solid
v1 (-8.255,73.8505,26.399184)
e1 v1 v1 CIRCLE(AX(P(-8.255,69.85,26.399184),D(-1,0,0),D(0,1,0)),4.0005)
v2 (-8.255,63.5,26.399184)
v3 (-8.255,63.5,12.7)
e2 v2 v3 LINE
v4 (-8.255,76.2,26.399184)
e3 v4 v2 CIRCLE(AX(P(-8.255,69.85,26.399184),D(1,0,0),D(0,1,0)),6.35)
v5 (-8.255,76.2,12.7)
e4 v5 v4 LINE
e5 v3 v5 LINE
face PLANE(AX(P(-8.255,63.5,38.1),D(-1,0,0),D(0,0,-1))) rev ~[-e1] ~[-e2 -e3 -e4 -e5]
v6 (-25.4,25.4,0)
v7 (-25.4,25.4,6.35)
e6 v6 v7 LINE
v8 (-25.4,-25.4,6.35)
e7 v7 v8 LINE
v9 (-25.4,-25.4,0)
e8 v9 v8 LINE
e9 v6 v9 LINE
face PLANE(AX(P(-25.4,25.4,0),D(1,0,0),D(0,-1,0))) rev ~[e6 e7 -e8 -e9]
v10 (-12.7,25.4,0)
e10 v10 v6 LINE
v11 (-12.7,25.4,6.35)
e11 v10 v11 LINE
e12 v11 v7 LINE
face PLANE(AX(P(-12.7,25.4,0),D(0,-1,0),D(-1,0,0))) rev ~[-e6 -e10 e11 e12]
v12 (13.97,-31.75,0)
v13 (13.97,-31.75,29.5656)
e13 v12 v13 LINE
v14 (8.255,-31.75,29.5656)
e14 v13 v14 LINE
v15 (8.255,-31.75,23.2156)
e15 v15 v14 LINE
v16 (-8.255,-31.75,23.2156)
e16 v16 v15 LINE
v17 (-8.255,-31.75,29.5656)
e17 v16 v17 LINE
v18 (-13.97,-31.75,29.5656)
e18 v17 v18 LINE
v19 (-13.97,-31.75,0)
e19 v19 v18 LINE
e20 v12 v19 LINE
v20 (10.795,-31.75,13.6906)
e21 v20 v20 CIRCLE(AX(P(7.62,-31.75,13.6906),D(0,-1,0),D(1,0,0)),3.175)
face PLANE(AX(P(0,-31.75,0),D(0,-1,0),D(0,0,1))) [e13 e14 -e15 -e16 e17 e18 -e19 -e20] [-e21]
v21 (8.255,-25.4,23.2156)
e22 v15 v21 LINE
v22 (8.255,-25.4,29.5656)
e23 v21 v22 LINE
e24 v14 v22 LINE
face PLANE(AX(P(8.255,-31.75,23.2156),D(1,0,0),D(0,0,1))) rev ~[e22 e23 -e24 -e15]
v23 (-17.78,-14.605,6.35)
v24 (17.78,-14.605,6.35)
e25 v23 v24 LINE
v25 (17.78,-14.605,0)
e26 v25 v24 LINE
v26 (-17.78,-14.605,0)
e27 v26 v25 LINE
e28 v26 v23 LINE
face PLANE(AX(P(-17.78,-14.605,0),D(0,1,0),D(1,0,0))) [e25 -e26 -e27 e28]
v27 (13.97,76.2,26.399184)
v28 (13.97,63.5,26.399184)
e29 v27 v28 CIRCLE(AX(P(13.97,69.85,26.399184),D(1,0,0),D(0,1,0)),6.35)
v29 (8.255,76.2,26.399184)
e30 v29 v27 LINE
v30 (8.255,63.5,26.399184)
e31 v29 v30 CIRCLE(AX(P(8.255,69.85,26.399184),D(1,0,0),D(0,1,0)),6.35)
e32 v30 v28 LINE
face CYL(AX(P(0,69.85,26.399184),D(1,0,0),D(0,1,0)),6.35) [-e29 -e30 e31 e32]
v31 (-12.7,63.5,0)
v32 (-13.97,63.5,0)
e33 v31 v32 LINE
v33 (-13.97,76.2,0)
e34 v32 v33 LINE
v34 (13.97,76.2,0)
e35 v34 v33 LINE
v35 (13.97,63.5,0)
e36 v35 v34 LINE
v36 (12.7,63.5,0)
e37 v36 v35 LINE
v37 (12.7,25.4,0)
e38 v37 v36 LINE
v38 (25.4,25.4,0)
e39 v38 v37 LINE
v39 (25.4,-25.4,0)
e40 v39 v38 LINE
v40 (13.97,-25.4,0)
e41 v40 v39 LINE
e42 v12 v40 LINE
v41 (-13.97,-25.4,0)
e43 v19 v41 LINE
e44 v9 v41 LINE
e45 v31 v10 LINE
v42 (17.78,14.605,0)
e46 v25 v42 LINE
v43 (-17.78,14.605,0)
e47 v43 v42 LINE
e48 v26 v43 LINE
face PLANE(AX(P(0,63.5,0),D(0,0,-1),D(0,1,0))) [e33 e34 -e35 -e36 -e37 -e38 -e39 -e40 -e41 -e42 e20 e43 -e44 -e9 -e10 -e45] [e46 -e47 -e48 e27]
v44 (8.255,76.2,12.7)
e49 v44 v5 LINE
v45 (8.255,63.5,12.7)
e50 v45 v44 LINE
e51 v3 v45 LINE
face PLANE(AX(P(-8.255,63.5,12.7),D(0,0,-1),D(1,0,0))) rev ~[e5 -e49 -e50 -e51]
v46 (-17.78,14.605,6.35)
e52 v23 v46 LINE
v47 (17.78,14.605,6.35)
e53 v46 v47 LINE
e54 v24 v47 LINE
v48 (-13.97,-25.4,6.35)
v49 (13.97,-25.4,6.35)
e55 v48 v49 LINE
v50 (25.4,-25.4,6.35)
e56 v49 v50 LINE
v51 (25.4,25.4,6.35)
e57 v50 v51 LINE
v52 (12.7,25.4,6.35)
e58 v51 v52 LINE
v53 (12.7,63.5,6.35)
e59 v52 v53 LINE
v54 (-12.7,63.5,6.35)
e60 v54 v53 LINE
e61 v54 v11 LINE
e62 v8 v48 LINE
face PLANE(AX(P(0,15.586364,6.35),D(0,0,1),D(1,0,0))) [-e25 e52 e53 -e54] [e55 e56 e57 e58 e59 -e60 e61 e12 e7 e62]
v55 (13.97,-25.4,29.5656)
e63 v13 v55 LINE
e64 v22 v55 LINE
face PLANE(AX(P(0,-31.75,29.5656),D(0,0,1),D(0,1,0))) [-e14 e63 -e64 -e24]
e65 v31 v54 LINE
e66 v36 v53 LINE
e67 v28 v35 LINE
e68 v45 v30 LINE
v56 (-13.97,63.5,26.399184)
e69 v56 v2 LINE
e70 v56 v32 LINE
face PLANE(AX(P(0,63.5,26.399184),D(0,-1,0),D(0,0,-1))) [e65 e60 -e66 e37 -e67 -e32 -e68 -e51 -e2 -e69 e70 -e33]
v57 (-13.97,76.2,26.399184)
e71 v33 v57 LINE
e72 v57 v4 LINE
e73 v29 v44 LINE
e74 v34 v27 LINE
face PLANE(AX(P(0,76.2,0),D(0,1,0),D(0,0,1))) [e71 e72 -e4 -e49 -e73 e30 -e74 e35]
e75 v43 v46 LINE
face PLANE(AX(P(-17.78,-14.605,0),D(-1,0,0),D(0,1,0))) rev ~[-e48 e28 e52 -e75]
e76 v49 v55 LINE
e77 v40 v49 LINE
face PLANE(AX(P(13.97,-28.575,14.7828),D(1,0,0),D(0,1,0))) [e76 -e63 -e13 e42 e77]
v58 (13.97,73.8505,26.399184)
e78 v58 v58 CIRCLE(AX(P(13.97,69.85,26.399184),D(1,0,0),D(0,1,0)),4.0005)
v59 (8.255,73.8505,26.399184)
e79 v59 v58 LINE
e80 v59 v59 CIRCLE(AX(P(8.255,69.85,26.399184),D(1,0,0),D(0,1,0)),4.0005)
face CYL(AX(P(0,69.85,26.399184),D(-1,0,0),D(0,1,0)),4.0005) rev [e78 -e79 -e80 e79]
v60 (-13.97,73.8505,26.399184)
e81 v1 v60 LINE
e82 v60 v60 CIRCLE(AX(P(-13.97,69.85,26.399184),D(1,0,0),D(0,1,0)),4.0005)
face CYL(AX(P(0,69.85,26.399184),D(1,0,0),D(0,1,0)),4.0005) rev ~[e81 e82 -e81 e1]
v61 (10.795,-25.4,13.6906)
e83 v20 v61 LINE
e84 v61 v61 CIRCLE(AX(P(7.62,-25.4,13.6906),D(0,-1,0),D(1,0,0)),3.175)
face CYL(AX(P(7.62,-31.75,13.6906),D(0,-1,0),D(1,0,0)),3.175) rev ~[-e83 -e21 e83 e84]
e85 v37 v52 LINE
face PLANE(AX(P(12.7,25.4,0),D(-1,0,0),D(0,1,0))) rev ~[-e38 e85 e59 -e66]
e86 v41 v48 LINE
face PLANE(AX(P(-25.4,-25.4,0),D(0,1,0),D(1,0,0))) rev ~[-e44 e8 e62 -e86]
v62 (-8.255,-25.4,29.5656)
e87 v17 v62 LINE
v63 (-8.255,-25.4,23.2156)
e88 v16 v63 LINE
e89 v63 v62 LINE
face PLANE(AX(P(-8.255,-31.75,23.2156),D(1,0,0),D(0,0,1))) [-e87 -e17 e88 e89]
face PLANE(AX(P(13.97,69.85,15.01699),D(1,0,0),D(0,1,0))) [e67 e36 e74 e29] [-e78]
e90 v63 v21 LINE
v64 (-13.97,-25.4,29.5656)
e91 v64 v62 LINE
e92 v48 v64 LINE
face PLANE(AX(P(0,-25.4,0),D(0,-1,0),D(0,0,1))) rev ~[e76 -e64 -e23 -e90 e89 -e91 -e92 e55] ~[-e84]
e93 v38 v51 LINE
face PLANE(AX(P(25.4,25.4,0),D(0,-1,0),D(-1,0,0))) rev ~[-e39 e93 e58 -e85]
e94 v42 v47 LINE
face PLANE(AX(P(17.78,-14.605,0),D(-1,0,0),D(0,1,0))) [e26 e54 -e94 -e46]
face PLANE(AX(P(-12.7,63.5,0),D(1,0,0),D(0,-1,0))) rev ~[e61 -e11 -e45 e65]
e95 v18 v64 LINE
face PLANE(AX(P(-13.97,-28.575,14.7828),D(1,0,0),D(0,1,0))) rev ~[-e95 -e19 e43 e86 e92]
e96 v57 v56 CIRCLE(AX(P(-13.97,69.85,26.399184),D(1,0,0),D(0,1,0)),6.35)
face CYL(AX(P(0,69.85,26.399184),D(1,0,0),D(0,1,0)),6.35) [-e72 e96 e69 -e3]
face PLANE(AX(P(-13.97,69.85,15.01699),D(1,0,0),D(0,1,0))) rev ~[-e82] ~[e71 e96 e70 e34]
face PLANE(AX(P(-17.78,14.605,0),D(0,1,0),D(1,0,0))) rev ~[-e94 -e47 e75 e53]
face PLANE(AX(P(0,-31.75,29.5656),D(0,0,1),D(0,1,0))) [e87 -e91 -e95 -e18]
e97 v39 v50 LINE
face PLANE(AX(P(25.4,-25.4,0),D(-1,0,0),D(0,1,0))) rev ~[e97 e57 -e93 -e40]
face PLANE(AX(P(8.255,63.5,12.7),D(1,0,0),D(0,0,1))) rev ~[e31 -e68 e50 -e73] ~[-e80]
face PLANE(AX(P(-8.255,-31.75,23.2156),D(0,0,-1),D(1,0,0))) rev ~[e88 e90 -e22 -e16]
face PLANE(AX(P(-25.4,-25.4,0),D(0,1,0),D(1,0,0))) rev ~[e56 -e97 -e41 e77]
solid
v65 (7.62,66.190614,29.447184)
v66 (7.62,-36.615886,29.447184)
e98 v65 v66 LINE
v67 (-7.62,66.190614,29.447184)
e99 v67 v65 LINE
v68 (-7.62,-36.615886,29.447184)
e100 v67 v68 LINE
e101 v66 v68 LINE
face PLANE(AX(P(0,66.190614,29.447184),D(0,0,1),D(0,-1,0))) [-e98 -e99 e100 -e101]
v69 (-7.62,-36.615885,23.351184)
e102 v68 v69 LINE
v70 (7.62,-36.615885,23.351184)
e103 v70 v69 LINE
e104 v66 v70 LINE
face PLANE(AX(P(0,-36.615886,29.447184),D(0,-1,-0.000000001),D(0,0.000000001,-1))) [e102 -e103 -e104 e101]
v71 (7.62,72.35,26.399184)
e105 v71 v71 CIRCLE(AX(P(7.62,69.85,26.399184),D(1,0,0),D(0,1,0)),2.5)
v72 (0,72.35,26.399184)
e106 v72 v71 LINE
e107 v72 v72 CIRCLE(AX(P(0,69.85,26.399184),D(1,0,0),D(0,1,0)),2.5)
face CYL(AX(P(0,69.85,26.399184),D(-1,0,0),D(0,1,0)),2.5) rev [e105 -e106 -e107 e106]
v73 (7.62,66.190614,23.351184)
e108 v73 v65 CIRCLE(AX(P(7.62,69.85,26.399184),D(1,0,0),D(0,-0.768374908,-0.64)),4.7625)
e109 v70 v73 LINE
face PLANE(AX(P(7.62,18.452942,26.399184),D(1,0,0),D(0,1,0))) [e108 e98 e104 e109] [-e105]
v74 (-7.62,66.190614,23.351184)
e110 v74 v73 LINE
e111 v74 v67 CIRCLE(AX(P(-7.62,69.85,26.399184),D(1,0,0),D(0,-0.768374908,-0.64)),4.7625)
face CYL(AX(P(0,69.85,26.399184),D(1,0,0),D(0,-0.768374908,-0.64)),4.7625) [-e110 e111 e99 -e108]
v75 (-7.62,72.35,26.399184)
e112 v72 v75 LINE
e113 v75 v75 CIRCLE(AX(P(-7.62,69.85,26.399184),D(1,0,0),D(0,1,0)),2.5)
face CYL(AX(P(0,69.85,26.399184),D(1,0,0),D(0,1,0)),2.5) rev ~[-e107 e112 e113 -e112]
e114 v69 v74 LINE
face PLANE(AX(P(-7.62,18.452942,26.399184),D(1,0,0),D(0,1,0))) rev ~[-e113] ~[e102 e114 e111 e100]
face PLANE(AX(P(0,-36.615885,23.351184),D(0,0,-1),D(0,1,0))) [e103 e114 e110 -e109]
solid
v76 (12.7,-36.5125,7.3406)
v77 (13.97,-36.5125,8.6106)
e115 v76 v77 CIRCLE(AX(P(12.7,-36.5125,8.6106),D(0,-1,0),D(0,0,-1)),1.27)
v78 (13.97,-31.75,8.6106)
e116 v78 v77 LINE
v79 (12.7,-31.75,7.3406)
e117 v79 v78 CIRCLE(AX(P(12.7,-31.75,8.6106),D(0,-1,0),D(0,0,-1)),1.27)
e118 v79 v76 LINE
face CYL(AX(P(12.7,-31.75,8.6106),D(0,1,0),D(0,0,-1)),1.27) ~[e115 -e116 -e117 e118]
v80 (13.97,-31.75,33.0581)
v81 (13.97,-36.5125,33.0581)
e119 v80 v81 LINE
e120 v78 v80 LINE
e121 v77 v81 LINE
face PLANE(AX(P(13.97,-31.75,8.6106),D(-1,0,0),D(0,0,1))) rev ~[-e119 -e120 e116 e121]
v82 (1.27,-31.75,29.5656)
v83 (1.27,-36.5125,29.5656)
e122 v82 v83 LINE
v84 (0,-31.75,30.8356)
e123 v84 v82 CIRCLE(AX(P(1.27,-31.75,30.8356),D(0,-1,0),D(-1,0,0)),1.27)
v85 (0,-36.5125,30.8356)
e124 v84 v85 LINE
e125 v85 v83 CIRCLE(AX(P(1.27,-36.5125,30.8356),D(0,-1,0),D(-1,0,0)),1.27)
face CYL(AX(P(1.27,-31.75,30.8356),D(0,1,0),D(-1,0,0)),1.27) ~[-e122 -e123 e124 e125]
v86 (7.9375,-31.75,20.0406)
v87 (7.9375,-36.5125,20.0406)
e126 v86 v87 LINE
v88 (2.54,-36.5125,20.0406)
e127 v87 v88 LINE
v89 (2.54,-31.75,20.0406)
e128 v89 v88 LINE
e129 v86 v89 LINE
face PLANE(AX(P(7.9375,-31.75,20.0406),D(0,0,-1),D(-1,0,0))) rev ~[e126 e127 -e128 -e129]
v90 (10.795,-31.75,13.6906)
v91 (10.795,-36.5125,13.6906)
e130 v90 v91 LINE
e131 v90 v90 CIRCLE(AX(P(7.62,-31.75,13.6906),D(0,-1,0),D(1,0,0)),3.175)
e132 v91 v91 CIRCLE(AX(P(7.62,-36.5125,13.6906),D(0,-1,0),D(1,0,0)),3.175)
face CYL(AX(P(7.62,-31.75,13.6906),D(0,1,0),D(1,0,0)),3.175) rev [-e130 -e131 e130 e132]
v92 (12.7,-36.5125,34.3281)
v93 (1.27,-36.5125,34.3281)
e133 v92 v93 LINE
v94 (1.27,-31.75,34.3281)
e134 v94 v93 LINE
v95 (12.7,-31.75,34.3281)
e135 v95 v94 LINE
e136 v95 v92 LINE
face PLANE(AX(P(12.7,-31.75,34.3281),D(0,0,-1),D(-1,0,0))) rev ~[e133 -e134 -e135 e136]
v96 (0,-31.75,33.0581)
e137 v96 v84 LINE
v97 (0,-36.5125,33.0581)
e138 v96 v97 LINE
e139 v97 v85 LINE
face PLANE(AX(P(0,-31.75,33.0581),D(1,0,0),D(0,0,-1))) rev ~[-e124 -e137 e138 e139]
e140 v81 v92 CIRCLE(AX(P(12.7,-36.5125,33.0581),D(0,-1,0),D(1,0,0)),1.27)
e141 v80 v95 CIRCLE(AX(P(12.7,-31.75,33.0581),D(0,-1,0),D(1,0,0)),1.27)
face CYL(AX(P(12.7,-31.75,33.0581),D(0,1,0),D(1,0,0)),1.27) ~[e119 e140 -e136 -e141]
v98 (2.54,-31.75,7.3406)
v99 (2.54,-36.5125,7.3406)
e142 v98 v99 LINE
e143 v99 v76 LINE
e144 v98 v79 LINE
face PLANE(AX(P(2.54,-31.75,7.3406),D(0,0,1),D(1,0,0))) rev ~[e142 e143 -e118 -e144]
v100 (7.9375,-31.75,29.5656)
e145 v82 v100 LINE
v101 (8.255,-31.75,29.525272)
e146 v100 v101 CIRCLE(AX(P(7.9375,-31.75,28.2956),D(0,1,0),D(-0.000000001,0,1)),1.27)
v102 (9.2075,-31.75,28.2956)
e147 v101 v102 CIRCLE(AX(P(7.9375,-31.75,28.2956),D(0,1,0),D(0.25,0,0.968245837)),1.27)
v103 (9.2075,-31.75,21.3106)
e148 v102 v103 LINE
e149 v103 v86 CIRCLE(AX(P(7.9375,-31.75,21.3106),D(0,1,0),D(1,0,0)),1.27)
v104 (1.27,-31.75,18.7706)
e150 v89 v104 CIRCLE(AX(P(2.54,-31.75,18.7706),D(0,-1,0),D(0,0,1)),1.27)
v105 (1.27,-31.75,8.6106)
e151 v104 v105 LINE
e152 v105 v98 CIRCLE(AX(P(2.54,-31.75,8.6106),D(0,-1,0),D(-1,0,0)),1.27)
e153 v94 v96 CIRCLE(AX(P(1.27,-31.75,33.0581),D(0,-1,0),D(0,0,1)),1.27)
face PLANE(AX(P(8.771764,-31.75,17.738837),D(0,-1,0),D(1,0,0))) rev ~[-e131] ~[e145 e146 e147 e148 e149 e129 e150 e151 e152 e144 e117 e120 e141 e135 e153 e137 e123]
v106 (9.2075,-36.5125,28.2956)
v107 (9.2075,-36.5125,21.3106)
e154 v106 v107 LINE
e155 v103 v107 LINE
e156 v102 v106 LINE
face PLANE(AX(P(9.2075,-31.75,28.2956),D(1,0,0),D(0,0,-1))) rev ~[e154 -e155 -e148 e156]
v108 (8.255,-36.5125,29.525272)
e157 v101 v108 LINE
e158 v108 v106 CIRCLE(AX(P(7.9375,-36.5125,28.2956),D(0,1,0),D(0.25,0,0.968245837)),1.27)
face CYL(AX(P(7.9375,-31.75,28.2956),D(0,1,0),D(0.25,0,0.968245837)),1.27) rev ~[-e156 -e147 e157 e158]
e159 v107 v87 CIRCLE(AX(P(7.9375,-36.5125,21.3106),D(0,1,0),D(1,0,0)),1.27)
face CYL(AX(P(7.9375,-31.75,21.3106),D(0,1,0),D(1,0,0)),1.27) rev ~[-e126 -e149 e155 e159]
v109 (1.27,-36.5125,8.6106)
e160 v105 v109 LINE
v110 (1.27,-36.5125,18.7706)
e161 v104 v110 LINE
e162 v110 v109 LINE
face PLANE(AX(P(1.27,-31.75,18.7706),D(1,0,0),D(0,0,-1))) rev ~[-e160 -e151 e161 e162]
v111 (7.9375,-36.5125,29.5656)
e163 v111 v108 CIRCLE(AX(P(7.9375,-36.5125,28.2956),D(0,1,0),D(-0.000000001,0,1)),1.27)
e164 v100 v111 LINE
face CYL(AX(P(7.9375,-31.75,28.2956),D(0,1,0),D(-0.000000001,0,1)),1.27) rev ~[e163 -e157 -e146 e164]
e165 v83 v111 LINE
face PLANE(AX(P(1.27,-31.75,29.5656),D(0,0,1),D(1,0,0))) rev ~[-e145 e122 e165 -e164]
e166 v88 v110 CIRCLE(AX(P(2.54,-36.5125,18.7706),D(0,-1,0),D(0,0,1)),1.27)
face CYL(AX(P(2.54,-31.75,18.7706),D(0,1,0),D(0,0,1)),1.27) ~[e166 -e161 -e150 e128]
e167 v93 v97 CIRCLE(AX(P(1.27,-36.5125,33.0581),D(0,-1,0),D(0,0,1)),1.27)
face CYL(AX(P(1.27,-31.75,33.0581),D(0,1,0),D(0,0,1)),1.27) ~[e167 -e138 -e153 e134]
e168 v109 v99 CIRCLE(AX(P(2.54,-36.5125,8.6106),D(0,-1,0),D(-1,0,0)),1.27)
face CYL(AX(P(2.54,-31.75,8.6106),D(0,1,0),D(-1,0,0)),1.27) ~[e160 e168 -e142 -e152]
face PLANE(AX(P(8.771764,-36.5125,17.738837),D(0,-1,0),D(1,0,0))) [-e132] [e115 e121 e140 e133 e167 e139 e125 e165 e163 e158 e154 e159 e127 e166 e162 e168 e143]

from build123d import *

# Parameters (mm, degrees)
F0_W          = 35.56
F0_H          = 29.21
F1_DEPTH      = 6.35
F2_R          = 4.0005
F2_W          = 6.35
F2_H          = 29.5656
F3_DEPTH      = 13.97
F3_DEPTH_BACK = 13.97
F4_W          = 16.51
F4_H          = 11.7008156112
F4_H_2        = 13.6991843888
F5_DEPTH      = 12.701
F6_R          = 2.5
F7_DEPTH      = 7.62
F7_DEPTH_BACK = 7.62
F8_W          = 16.51
F8_H          = 6.35
F9_DEPTH      = 106.3635
F10_R         = 3.175
F11_DEPTH     = 4.7625
F12_DEPTH     = 6.35


with BuildPart() as f1:
    # F0 (on Top) → F1 (new body)
    with BuildSketch(Plane.XY):
        Polygon((-12.7, 25.4), (-25.4, 25.4), (-25.4, -25.4), (25.4, -25.4), (25.4, 25.4), (12.7, 25.4), (12.7, 63.5), (-12.7, 63.5), align=None)
        Rectangle(F0_W, F0_H, mode=Mode.SUBTRACT)
    extrude(amount=F1_DEPTH)

    # F2 (on Right) → F3 (join, two sides)
    with BuildSketch(Plane.YZ) as f3_sk:
        with BuildLine():
            Line((76.2, 0), (76.2, 26.3991843888))
            ThreePointArc((76.2, 26.3991843888), (69.85, 32.7491843888), (63.5, 26.3991843888))
            Line((63.5, 26.3991843888), (63.5, 0))
            Line((63.5, 0), (76.2, 0))
        make_face()
        with Locations((69.85, 26.3991843888)):
            Circle(F2_R, mode=Mode.SUBTRACT)
        with Locations((-28.575, 14.7828)):
            Rectangle(F2_W, F2_H)
    extrude(amount=F3_DEPTH)
    extrude(f3_sk.sketch, amount=-F3_DEPTH_BACK)

    # F4 (on face) → F5 (cut, through all)
    with BuildSketch(Plane.XZ.offset(-63.5)):
        with Locations((0, 32.2495921944)):
            Rectangle(F4_W, F4_H)
        with Locations((0, 19.5495921944)):
            Rectangle(F4_W, F4_H_2)
    extrude(amount=-F5_DEPTH, mode=Mode.SUBTRACT)

    # F8 (on face) → F9 (cut, through all)
    with BuildSketch(Plane.XZ.offset(31.75)):
        with Locations((0, 26.3906)):
            Rectangle(F8_W, F8_H)
    extrude(amount=-F9_DEPTH, mode=Mode.SUBTRACT)

    # F10 (on face) → F12 (cut, through all)
    with BuildSketch(Plane.XZ.offset(31.75)):
        with Locations((7.62, 13.6906)):
            Circle(F10_R)
    extrude(amount=-F12_DEPTH, mode=Mode.SUBTRACT)


with BuildPart() as f7:
    # F6 (on Right) → F7 (new body, two sides)
    with BuildSketch(Plane.YZ) as f7_sk:
        with BuildLine():
            Line((-36.6158854962, 23.3511843888), (66.1906144983, 23.3511843888))
            ThreePointArc((66.1906144983, 23.3511843888), (74.6125, 26.3991843888), (66.1906144983, 29.4471843888))
            Line((66.1906144983, 29.4471843888), (-36.6158855017, 29.4471843888))
            Line((-36.6158855017, 29.4471843888), (-36.6158854962, 23.3511843888))
        make_face()
        with Locations((69.85, 26.3991843888)):
            Circle(F6_R, mode=Mode.SUBTRACT)
    extrude(amount=F7_DEPTH)
    extrude(f7_sk.sketch, amount=-F7_DEPTH_BACK)


with BuildPart() as f11:
    # F10 (on face) → F11 (new body)
    with BuildSketch(Plane.XZ.offset(31.75)):
        with BuildLine():
            Line((8.255, 29.5656), (8.255, 29.5252722124))
            ThreePointArc((8.255, 29.5252722124), (8.9415231571, 29.0733129933), (9.2075, 28.2956))
            Line((9.2075, 28.2956), (9.2075, 21.3106))
            ThreePointArc((9.2075, 21.3106), (8.8355256121, 20.4125743879), (7.9375, 20.0406))
            Line((7.9375, 20.0406), (2.54, 20.0406))
            ThreePointArc((2.54, 20.0406), (1.6419743879, 19.6686256121), (1.27, 18.7706))
            Line((1.27, 18.7706), (1.27, 8.6106))
            ThreePointArc((1.27, 8.6106), (1.6419743879, 7.7125743879), (2.54, 7.3406))
            Line((2.54, 7.3406), (12.7, 7.3406))
            ThreePointArc((12.7, 7.3406), (13.5980256121, 7.7125743879), (13.97, 8.6106))
            Line((13.97, 8.6106), (13.97, 29.5656))
            Line((13.97, 29.5656), (8.255, 29.5656))
        make_face()
        with Locations((7.62, 13.6906)):
            Circle(F10_R, mode=Mode.SUBTRACT)
        with BuildLine():
            Line((0, 33.0581), (0, 30.8356))
            ThreePointArc((0, 30.8356), (0.3719743879, 29.9375743879), (1.27, 29.5656))
            Line((1.27, 29.5656), (7.9375, 29.5656))
            ThreePointArc((7.9375, 29.5656), (8.0975254515, 29.5554777143), (8.255, 29.5252722124))
            Line((8.255, 29.5252722124), (8.255, 29.5656))
            Line((8.255, 29.5656), (13.97, 29.5656))
            Line((13.97, 29.5656), (13.97, 33.0581))
            ThreePointArc((13.97, 33.0581), (13.5980256121, 33.9561256121), (12.7, 34.3281))
            Line((12.7, 34.3281), (1.27, 34.3281))
            ThreePointArc((1.27, 34.3281), (0.3719743879, 33.9561256121), (0, 33.0581))
        make_face()
    extrude(amount=F11_DEPTH)


solid = Compound([f1.part, f7.part, f11.part])
